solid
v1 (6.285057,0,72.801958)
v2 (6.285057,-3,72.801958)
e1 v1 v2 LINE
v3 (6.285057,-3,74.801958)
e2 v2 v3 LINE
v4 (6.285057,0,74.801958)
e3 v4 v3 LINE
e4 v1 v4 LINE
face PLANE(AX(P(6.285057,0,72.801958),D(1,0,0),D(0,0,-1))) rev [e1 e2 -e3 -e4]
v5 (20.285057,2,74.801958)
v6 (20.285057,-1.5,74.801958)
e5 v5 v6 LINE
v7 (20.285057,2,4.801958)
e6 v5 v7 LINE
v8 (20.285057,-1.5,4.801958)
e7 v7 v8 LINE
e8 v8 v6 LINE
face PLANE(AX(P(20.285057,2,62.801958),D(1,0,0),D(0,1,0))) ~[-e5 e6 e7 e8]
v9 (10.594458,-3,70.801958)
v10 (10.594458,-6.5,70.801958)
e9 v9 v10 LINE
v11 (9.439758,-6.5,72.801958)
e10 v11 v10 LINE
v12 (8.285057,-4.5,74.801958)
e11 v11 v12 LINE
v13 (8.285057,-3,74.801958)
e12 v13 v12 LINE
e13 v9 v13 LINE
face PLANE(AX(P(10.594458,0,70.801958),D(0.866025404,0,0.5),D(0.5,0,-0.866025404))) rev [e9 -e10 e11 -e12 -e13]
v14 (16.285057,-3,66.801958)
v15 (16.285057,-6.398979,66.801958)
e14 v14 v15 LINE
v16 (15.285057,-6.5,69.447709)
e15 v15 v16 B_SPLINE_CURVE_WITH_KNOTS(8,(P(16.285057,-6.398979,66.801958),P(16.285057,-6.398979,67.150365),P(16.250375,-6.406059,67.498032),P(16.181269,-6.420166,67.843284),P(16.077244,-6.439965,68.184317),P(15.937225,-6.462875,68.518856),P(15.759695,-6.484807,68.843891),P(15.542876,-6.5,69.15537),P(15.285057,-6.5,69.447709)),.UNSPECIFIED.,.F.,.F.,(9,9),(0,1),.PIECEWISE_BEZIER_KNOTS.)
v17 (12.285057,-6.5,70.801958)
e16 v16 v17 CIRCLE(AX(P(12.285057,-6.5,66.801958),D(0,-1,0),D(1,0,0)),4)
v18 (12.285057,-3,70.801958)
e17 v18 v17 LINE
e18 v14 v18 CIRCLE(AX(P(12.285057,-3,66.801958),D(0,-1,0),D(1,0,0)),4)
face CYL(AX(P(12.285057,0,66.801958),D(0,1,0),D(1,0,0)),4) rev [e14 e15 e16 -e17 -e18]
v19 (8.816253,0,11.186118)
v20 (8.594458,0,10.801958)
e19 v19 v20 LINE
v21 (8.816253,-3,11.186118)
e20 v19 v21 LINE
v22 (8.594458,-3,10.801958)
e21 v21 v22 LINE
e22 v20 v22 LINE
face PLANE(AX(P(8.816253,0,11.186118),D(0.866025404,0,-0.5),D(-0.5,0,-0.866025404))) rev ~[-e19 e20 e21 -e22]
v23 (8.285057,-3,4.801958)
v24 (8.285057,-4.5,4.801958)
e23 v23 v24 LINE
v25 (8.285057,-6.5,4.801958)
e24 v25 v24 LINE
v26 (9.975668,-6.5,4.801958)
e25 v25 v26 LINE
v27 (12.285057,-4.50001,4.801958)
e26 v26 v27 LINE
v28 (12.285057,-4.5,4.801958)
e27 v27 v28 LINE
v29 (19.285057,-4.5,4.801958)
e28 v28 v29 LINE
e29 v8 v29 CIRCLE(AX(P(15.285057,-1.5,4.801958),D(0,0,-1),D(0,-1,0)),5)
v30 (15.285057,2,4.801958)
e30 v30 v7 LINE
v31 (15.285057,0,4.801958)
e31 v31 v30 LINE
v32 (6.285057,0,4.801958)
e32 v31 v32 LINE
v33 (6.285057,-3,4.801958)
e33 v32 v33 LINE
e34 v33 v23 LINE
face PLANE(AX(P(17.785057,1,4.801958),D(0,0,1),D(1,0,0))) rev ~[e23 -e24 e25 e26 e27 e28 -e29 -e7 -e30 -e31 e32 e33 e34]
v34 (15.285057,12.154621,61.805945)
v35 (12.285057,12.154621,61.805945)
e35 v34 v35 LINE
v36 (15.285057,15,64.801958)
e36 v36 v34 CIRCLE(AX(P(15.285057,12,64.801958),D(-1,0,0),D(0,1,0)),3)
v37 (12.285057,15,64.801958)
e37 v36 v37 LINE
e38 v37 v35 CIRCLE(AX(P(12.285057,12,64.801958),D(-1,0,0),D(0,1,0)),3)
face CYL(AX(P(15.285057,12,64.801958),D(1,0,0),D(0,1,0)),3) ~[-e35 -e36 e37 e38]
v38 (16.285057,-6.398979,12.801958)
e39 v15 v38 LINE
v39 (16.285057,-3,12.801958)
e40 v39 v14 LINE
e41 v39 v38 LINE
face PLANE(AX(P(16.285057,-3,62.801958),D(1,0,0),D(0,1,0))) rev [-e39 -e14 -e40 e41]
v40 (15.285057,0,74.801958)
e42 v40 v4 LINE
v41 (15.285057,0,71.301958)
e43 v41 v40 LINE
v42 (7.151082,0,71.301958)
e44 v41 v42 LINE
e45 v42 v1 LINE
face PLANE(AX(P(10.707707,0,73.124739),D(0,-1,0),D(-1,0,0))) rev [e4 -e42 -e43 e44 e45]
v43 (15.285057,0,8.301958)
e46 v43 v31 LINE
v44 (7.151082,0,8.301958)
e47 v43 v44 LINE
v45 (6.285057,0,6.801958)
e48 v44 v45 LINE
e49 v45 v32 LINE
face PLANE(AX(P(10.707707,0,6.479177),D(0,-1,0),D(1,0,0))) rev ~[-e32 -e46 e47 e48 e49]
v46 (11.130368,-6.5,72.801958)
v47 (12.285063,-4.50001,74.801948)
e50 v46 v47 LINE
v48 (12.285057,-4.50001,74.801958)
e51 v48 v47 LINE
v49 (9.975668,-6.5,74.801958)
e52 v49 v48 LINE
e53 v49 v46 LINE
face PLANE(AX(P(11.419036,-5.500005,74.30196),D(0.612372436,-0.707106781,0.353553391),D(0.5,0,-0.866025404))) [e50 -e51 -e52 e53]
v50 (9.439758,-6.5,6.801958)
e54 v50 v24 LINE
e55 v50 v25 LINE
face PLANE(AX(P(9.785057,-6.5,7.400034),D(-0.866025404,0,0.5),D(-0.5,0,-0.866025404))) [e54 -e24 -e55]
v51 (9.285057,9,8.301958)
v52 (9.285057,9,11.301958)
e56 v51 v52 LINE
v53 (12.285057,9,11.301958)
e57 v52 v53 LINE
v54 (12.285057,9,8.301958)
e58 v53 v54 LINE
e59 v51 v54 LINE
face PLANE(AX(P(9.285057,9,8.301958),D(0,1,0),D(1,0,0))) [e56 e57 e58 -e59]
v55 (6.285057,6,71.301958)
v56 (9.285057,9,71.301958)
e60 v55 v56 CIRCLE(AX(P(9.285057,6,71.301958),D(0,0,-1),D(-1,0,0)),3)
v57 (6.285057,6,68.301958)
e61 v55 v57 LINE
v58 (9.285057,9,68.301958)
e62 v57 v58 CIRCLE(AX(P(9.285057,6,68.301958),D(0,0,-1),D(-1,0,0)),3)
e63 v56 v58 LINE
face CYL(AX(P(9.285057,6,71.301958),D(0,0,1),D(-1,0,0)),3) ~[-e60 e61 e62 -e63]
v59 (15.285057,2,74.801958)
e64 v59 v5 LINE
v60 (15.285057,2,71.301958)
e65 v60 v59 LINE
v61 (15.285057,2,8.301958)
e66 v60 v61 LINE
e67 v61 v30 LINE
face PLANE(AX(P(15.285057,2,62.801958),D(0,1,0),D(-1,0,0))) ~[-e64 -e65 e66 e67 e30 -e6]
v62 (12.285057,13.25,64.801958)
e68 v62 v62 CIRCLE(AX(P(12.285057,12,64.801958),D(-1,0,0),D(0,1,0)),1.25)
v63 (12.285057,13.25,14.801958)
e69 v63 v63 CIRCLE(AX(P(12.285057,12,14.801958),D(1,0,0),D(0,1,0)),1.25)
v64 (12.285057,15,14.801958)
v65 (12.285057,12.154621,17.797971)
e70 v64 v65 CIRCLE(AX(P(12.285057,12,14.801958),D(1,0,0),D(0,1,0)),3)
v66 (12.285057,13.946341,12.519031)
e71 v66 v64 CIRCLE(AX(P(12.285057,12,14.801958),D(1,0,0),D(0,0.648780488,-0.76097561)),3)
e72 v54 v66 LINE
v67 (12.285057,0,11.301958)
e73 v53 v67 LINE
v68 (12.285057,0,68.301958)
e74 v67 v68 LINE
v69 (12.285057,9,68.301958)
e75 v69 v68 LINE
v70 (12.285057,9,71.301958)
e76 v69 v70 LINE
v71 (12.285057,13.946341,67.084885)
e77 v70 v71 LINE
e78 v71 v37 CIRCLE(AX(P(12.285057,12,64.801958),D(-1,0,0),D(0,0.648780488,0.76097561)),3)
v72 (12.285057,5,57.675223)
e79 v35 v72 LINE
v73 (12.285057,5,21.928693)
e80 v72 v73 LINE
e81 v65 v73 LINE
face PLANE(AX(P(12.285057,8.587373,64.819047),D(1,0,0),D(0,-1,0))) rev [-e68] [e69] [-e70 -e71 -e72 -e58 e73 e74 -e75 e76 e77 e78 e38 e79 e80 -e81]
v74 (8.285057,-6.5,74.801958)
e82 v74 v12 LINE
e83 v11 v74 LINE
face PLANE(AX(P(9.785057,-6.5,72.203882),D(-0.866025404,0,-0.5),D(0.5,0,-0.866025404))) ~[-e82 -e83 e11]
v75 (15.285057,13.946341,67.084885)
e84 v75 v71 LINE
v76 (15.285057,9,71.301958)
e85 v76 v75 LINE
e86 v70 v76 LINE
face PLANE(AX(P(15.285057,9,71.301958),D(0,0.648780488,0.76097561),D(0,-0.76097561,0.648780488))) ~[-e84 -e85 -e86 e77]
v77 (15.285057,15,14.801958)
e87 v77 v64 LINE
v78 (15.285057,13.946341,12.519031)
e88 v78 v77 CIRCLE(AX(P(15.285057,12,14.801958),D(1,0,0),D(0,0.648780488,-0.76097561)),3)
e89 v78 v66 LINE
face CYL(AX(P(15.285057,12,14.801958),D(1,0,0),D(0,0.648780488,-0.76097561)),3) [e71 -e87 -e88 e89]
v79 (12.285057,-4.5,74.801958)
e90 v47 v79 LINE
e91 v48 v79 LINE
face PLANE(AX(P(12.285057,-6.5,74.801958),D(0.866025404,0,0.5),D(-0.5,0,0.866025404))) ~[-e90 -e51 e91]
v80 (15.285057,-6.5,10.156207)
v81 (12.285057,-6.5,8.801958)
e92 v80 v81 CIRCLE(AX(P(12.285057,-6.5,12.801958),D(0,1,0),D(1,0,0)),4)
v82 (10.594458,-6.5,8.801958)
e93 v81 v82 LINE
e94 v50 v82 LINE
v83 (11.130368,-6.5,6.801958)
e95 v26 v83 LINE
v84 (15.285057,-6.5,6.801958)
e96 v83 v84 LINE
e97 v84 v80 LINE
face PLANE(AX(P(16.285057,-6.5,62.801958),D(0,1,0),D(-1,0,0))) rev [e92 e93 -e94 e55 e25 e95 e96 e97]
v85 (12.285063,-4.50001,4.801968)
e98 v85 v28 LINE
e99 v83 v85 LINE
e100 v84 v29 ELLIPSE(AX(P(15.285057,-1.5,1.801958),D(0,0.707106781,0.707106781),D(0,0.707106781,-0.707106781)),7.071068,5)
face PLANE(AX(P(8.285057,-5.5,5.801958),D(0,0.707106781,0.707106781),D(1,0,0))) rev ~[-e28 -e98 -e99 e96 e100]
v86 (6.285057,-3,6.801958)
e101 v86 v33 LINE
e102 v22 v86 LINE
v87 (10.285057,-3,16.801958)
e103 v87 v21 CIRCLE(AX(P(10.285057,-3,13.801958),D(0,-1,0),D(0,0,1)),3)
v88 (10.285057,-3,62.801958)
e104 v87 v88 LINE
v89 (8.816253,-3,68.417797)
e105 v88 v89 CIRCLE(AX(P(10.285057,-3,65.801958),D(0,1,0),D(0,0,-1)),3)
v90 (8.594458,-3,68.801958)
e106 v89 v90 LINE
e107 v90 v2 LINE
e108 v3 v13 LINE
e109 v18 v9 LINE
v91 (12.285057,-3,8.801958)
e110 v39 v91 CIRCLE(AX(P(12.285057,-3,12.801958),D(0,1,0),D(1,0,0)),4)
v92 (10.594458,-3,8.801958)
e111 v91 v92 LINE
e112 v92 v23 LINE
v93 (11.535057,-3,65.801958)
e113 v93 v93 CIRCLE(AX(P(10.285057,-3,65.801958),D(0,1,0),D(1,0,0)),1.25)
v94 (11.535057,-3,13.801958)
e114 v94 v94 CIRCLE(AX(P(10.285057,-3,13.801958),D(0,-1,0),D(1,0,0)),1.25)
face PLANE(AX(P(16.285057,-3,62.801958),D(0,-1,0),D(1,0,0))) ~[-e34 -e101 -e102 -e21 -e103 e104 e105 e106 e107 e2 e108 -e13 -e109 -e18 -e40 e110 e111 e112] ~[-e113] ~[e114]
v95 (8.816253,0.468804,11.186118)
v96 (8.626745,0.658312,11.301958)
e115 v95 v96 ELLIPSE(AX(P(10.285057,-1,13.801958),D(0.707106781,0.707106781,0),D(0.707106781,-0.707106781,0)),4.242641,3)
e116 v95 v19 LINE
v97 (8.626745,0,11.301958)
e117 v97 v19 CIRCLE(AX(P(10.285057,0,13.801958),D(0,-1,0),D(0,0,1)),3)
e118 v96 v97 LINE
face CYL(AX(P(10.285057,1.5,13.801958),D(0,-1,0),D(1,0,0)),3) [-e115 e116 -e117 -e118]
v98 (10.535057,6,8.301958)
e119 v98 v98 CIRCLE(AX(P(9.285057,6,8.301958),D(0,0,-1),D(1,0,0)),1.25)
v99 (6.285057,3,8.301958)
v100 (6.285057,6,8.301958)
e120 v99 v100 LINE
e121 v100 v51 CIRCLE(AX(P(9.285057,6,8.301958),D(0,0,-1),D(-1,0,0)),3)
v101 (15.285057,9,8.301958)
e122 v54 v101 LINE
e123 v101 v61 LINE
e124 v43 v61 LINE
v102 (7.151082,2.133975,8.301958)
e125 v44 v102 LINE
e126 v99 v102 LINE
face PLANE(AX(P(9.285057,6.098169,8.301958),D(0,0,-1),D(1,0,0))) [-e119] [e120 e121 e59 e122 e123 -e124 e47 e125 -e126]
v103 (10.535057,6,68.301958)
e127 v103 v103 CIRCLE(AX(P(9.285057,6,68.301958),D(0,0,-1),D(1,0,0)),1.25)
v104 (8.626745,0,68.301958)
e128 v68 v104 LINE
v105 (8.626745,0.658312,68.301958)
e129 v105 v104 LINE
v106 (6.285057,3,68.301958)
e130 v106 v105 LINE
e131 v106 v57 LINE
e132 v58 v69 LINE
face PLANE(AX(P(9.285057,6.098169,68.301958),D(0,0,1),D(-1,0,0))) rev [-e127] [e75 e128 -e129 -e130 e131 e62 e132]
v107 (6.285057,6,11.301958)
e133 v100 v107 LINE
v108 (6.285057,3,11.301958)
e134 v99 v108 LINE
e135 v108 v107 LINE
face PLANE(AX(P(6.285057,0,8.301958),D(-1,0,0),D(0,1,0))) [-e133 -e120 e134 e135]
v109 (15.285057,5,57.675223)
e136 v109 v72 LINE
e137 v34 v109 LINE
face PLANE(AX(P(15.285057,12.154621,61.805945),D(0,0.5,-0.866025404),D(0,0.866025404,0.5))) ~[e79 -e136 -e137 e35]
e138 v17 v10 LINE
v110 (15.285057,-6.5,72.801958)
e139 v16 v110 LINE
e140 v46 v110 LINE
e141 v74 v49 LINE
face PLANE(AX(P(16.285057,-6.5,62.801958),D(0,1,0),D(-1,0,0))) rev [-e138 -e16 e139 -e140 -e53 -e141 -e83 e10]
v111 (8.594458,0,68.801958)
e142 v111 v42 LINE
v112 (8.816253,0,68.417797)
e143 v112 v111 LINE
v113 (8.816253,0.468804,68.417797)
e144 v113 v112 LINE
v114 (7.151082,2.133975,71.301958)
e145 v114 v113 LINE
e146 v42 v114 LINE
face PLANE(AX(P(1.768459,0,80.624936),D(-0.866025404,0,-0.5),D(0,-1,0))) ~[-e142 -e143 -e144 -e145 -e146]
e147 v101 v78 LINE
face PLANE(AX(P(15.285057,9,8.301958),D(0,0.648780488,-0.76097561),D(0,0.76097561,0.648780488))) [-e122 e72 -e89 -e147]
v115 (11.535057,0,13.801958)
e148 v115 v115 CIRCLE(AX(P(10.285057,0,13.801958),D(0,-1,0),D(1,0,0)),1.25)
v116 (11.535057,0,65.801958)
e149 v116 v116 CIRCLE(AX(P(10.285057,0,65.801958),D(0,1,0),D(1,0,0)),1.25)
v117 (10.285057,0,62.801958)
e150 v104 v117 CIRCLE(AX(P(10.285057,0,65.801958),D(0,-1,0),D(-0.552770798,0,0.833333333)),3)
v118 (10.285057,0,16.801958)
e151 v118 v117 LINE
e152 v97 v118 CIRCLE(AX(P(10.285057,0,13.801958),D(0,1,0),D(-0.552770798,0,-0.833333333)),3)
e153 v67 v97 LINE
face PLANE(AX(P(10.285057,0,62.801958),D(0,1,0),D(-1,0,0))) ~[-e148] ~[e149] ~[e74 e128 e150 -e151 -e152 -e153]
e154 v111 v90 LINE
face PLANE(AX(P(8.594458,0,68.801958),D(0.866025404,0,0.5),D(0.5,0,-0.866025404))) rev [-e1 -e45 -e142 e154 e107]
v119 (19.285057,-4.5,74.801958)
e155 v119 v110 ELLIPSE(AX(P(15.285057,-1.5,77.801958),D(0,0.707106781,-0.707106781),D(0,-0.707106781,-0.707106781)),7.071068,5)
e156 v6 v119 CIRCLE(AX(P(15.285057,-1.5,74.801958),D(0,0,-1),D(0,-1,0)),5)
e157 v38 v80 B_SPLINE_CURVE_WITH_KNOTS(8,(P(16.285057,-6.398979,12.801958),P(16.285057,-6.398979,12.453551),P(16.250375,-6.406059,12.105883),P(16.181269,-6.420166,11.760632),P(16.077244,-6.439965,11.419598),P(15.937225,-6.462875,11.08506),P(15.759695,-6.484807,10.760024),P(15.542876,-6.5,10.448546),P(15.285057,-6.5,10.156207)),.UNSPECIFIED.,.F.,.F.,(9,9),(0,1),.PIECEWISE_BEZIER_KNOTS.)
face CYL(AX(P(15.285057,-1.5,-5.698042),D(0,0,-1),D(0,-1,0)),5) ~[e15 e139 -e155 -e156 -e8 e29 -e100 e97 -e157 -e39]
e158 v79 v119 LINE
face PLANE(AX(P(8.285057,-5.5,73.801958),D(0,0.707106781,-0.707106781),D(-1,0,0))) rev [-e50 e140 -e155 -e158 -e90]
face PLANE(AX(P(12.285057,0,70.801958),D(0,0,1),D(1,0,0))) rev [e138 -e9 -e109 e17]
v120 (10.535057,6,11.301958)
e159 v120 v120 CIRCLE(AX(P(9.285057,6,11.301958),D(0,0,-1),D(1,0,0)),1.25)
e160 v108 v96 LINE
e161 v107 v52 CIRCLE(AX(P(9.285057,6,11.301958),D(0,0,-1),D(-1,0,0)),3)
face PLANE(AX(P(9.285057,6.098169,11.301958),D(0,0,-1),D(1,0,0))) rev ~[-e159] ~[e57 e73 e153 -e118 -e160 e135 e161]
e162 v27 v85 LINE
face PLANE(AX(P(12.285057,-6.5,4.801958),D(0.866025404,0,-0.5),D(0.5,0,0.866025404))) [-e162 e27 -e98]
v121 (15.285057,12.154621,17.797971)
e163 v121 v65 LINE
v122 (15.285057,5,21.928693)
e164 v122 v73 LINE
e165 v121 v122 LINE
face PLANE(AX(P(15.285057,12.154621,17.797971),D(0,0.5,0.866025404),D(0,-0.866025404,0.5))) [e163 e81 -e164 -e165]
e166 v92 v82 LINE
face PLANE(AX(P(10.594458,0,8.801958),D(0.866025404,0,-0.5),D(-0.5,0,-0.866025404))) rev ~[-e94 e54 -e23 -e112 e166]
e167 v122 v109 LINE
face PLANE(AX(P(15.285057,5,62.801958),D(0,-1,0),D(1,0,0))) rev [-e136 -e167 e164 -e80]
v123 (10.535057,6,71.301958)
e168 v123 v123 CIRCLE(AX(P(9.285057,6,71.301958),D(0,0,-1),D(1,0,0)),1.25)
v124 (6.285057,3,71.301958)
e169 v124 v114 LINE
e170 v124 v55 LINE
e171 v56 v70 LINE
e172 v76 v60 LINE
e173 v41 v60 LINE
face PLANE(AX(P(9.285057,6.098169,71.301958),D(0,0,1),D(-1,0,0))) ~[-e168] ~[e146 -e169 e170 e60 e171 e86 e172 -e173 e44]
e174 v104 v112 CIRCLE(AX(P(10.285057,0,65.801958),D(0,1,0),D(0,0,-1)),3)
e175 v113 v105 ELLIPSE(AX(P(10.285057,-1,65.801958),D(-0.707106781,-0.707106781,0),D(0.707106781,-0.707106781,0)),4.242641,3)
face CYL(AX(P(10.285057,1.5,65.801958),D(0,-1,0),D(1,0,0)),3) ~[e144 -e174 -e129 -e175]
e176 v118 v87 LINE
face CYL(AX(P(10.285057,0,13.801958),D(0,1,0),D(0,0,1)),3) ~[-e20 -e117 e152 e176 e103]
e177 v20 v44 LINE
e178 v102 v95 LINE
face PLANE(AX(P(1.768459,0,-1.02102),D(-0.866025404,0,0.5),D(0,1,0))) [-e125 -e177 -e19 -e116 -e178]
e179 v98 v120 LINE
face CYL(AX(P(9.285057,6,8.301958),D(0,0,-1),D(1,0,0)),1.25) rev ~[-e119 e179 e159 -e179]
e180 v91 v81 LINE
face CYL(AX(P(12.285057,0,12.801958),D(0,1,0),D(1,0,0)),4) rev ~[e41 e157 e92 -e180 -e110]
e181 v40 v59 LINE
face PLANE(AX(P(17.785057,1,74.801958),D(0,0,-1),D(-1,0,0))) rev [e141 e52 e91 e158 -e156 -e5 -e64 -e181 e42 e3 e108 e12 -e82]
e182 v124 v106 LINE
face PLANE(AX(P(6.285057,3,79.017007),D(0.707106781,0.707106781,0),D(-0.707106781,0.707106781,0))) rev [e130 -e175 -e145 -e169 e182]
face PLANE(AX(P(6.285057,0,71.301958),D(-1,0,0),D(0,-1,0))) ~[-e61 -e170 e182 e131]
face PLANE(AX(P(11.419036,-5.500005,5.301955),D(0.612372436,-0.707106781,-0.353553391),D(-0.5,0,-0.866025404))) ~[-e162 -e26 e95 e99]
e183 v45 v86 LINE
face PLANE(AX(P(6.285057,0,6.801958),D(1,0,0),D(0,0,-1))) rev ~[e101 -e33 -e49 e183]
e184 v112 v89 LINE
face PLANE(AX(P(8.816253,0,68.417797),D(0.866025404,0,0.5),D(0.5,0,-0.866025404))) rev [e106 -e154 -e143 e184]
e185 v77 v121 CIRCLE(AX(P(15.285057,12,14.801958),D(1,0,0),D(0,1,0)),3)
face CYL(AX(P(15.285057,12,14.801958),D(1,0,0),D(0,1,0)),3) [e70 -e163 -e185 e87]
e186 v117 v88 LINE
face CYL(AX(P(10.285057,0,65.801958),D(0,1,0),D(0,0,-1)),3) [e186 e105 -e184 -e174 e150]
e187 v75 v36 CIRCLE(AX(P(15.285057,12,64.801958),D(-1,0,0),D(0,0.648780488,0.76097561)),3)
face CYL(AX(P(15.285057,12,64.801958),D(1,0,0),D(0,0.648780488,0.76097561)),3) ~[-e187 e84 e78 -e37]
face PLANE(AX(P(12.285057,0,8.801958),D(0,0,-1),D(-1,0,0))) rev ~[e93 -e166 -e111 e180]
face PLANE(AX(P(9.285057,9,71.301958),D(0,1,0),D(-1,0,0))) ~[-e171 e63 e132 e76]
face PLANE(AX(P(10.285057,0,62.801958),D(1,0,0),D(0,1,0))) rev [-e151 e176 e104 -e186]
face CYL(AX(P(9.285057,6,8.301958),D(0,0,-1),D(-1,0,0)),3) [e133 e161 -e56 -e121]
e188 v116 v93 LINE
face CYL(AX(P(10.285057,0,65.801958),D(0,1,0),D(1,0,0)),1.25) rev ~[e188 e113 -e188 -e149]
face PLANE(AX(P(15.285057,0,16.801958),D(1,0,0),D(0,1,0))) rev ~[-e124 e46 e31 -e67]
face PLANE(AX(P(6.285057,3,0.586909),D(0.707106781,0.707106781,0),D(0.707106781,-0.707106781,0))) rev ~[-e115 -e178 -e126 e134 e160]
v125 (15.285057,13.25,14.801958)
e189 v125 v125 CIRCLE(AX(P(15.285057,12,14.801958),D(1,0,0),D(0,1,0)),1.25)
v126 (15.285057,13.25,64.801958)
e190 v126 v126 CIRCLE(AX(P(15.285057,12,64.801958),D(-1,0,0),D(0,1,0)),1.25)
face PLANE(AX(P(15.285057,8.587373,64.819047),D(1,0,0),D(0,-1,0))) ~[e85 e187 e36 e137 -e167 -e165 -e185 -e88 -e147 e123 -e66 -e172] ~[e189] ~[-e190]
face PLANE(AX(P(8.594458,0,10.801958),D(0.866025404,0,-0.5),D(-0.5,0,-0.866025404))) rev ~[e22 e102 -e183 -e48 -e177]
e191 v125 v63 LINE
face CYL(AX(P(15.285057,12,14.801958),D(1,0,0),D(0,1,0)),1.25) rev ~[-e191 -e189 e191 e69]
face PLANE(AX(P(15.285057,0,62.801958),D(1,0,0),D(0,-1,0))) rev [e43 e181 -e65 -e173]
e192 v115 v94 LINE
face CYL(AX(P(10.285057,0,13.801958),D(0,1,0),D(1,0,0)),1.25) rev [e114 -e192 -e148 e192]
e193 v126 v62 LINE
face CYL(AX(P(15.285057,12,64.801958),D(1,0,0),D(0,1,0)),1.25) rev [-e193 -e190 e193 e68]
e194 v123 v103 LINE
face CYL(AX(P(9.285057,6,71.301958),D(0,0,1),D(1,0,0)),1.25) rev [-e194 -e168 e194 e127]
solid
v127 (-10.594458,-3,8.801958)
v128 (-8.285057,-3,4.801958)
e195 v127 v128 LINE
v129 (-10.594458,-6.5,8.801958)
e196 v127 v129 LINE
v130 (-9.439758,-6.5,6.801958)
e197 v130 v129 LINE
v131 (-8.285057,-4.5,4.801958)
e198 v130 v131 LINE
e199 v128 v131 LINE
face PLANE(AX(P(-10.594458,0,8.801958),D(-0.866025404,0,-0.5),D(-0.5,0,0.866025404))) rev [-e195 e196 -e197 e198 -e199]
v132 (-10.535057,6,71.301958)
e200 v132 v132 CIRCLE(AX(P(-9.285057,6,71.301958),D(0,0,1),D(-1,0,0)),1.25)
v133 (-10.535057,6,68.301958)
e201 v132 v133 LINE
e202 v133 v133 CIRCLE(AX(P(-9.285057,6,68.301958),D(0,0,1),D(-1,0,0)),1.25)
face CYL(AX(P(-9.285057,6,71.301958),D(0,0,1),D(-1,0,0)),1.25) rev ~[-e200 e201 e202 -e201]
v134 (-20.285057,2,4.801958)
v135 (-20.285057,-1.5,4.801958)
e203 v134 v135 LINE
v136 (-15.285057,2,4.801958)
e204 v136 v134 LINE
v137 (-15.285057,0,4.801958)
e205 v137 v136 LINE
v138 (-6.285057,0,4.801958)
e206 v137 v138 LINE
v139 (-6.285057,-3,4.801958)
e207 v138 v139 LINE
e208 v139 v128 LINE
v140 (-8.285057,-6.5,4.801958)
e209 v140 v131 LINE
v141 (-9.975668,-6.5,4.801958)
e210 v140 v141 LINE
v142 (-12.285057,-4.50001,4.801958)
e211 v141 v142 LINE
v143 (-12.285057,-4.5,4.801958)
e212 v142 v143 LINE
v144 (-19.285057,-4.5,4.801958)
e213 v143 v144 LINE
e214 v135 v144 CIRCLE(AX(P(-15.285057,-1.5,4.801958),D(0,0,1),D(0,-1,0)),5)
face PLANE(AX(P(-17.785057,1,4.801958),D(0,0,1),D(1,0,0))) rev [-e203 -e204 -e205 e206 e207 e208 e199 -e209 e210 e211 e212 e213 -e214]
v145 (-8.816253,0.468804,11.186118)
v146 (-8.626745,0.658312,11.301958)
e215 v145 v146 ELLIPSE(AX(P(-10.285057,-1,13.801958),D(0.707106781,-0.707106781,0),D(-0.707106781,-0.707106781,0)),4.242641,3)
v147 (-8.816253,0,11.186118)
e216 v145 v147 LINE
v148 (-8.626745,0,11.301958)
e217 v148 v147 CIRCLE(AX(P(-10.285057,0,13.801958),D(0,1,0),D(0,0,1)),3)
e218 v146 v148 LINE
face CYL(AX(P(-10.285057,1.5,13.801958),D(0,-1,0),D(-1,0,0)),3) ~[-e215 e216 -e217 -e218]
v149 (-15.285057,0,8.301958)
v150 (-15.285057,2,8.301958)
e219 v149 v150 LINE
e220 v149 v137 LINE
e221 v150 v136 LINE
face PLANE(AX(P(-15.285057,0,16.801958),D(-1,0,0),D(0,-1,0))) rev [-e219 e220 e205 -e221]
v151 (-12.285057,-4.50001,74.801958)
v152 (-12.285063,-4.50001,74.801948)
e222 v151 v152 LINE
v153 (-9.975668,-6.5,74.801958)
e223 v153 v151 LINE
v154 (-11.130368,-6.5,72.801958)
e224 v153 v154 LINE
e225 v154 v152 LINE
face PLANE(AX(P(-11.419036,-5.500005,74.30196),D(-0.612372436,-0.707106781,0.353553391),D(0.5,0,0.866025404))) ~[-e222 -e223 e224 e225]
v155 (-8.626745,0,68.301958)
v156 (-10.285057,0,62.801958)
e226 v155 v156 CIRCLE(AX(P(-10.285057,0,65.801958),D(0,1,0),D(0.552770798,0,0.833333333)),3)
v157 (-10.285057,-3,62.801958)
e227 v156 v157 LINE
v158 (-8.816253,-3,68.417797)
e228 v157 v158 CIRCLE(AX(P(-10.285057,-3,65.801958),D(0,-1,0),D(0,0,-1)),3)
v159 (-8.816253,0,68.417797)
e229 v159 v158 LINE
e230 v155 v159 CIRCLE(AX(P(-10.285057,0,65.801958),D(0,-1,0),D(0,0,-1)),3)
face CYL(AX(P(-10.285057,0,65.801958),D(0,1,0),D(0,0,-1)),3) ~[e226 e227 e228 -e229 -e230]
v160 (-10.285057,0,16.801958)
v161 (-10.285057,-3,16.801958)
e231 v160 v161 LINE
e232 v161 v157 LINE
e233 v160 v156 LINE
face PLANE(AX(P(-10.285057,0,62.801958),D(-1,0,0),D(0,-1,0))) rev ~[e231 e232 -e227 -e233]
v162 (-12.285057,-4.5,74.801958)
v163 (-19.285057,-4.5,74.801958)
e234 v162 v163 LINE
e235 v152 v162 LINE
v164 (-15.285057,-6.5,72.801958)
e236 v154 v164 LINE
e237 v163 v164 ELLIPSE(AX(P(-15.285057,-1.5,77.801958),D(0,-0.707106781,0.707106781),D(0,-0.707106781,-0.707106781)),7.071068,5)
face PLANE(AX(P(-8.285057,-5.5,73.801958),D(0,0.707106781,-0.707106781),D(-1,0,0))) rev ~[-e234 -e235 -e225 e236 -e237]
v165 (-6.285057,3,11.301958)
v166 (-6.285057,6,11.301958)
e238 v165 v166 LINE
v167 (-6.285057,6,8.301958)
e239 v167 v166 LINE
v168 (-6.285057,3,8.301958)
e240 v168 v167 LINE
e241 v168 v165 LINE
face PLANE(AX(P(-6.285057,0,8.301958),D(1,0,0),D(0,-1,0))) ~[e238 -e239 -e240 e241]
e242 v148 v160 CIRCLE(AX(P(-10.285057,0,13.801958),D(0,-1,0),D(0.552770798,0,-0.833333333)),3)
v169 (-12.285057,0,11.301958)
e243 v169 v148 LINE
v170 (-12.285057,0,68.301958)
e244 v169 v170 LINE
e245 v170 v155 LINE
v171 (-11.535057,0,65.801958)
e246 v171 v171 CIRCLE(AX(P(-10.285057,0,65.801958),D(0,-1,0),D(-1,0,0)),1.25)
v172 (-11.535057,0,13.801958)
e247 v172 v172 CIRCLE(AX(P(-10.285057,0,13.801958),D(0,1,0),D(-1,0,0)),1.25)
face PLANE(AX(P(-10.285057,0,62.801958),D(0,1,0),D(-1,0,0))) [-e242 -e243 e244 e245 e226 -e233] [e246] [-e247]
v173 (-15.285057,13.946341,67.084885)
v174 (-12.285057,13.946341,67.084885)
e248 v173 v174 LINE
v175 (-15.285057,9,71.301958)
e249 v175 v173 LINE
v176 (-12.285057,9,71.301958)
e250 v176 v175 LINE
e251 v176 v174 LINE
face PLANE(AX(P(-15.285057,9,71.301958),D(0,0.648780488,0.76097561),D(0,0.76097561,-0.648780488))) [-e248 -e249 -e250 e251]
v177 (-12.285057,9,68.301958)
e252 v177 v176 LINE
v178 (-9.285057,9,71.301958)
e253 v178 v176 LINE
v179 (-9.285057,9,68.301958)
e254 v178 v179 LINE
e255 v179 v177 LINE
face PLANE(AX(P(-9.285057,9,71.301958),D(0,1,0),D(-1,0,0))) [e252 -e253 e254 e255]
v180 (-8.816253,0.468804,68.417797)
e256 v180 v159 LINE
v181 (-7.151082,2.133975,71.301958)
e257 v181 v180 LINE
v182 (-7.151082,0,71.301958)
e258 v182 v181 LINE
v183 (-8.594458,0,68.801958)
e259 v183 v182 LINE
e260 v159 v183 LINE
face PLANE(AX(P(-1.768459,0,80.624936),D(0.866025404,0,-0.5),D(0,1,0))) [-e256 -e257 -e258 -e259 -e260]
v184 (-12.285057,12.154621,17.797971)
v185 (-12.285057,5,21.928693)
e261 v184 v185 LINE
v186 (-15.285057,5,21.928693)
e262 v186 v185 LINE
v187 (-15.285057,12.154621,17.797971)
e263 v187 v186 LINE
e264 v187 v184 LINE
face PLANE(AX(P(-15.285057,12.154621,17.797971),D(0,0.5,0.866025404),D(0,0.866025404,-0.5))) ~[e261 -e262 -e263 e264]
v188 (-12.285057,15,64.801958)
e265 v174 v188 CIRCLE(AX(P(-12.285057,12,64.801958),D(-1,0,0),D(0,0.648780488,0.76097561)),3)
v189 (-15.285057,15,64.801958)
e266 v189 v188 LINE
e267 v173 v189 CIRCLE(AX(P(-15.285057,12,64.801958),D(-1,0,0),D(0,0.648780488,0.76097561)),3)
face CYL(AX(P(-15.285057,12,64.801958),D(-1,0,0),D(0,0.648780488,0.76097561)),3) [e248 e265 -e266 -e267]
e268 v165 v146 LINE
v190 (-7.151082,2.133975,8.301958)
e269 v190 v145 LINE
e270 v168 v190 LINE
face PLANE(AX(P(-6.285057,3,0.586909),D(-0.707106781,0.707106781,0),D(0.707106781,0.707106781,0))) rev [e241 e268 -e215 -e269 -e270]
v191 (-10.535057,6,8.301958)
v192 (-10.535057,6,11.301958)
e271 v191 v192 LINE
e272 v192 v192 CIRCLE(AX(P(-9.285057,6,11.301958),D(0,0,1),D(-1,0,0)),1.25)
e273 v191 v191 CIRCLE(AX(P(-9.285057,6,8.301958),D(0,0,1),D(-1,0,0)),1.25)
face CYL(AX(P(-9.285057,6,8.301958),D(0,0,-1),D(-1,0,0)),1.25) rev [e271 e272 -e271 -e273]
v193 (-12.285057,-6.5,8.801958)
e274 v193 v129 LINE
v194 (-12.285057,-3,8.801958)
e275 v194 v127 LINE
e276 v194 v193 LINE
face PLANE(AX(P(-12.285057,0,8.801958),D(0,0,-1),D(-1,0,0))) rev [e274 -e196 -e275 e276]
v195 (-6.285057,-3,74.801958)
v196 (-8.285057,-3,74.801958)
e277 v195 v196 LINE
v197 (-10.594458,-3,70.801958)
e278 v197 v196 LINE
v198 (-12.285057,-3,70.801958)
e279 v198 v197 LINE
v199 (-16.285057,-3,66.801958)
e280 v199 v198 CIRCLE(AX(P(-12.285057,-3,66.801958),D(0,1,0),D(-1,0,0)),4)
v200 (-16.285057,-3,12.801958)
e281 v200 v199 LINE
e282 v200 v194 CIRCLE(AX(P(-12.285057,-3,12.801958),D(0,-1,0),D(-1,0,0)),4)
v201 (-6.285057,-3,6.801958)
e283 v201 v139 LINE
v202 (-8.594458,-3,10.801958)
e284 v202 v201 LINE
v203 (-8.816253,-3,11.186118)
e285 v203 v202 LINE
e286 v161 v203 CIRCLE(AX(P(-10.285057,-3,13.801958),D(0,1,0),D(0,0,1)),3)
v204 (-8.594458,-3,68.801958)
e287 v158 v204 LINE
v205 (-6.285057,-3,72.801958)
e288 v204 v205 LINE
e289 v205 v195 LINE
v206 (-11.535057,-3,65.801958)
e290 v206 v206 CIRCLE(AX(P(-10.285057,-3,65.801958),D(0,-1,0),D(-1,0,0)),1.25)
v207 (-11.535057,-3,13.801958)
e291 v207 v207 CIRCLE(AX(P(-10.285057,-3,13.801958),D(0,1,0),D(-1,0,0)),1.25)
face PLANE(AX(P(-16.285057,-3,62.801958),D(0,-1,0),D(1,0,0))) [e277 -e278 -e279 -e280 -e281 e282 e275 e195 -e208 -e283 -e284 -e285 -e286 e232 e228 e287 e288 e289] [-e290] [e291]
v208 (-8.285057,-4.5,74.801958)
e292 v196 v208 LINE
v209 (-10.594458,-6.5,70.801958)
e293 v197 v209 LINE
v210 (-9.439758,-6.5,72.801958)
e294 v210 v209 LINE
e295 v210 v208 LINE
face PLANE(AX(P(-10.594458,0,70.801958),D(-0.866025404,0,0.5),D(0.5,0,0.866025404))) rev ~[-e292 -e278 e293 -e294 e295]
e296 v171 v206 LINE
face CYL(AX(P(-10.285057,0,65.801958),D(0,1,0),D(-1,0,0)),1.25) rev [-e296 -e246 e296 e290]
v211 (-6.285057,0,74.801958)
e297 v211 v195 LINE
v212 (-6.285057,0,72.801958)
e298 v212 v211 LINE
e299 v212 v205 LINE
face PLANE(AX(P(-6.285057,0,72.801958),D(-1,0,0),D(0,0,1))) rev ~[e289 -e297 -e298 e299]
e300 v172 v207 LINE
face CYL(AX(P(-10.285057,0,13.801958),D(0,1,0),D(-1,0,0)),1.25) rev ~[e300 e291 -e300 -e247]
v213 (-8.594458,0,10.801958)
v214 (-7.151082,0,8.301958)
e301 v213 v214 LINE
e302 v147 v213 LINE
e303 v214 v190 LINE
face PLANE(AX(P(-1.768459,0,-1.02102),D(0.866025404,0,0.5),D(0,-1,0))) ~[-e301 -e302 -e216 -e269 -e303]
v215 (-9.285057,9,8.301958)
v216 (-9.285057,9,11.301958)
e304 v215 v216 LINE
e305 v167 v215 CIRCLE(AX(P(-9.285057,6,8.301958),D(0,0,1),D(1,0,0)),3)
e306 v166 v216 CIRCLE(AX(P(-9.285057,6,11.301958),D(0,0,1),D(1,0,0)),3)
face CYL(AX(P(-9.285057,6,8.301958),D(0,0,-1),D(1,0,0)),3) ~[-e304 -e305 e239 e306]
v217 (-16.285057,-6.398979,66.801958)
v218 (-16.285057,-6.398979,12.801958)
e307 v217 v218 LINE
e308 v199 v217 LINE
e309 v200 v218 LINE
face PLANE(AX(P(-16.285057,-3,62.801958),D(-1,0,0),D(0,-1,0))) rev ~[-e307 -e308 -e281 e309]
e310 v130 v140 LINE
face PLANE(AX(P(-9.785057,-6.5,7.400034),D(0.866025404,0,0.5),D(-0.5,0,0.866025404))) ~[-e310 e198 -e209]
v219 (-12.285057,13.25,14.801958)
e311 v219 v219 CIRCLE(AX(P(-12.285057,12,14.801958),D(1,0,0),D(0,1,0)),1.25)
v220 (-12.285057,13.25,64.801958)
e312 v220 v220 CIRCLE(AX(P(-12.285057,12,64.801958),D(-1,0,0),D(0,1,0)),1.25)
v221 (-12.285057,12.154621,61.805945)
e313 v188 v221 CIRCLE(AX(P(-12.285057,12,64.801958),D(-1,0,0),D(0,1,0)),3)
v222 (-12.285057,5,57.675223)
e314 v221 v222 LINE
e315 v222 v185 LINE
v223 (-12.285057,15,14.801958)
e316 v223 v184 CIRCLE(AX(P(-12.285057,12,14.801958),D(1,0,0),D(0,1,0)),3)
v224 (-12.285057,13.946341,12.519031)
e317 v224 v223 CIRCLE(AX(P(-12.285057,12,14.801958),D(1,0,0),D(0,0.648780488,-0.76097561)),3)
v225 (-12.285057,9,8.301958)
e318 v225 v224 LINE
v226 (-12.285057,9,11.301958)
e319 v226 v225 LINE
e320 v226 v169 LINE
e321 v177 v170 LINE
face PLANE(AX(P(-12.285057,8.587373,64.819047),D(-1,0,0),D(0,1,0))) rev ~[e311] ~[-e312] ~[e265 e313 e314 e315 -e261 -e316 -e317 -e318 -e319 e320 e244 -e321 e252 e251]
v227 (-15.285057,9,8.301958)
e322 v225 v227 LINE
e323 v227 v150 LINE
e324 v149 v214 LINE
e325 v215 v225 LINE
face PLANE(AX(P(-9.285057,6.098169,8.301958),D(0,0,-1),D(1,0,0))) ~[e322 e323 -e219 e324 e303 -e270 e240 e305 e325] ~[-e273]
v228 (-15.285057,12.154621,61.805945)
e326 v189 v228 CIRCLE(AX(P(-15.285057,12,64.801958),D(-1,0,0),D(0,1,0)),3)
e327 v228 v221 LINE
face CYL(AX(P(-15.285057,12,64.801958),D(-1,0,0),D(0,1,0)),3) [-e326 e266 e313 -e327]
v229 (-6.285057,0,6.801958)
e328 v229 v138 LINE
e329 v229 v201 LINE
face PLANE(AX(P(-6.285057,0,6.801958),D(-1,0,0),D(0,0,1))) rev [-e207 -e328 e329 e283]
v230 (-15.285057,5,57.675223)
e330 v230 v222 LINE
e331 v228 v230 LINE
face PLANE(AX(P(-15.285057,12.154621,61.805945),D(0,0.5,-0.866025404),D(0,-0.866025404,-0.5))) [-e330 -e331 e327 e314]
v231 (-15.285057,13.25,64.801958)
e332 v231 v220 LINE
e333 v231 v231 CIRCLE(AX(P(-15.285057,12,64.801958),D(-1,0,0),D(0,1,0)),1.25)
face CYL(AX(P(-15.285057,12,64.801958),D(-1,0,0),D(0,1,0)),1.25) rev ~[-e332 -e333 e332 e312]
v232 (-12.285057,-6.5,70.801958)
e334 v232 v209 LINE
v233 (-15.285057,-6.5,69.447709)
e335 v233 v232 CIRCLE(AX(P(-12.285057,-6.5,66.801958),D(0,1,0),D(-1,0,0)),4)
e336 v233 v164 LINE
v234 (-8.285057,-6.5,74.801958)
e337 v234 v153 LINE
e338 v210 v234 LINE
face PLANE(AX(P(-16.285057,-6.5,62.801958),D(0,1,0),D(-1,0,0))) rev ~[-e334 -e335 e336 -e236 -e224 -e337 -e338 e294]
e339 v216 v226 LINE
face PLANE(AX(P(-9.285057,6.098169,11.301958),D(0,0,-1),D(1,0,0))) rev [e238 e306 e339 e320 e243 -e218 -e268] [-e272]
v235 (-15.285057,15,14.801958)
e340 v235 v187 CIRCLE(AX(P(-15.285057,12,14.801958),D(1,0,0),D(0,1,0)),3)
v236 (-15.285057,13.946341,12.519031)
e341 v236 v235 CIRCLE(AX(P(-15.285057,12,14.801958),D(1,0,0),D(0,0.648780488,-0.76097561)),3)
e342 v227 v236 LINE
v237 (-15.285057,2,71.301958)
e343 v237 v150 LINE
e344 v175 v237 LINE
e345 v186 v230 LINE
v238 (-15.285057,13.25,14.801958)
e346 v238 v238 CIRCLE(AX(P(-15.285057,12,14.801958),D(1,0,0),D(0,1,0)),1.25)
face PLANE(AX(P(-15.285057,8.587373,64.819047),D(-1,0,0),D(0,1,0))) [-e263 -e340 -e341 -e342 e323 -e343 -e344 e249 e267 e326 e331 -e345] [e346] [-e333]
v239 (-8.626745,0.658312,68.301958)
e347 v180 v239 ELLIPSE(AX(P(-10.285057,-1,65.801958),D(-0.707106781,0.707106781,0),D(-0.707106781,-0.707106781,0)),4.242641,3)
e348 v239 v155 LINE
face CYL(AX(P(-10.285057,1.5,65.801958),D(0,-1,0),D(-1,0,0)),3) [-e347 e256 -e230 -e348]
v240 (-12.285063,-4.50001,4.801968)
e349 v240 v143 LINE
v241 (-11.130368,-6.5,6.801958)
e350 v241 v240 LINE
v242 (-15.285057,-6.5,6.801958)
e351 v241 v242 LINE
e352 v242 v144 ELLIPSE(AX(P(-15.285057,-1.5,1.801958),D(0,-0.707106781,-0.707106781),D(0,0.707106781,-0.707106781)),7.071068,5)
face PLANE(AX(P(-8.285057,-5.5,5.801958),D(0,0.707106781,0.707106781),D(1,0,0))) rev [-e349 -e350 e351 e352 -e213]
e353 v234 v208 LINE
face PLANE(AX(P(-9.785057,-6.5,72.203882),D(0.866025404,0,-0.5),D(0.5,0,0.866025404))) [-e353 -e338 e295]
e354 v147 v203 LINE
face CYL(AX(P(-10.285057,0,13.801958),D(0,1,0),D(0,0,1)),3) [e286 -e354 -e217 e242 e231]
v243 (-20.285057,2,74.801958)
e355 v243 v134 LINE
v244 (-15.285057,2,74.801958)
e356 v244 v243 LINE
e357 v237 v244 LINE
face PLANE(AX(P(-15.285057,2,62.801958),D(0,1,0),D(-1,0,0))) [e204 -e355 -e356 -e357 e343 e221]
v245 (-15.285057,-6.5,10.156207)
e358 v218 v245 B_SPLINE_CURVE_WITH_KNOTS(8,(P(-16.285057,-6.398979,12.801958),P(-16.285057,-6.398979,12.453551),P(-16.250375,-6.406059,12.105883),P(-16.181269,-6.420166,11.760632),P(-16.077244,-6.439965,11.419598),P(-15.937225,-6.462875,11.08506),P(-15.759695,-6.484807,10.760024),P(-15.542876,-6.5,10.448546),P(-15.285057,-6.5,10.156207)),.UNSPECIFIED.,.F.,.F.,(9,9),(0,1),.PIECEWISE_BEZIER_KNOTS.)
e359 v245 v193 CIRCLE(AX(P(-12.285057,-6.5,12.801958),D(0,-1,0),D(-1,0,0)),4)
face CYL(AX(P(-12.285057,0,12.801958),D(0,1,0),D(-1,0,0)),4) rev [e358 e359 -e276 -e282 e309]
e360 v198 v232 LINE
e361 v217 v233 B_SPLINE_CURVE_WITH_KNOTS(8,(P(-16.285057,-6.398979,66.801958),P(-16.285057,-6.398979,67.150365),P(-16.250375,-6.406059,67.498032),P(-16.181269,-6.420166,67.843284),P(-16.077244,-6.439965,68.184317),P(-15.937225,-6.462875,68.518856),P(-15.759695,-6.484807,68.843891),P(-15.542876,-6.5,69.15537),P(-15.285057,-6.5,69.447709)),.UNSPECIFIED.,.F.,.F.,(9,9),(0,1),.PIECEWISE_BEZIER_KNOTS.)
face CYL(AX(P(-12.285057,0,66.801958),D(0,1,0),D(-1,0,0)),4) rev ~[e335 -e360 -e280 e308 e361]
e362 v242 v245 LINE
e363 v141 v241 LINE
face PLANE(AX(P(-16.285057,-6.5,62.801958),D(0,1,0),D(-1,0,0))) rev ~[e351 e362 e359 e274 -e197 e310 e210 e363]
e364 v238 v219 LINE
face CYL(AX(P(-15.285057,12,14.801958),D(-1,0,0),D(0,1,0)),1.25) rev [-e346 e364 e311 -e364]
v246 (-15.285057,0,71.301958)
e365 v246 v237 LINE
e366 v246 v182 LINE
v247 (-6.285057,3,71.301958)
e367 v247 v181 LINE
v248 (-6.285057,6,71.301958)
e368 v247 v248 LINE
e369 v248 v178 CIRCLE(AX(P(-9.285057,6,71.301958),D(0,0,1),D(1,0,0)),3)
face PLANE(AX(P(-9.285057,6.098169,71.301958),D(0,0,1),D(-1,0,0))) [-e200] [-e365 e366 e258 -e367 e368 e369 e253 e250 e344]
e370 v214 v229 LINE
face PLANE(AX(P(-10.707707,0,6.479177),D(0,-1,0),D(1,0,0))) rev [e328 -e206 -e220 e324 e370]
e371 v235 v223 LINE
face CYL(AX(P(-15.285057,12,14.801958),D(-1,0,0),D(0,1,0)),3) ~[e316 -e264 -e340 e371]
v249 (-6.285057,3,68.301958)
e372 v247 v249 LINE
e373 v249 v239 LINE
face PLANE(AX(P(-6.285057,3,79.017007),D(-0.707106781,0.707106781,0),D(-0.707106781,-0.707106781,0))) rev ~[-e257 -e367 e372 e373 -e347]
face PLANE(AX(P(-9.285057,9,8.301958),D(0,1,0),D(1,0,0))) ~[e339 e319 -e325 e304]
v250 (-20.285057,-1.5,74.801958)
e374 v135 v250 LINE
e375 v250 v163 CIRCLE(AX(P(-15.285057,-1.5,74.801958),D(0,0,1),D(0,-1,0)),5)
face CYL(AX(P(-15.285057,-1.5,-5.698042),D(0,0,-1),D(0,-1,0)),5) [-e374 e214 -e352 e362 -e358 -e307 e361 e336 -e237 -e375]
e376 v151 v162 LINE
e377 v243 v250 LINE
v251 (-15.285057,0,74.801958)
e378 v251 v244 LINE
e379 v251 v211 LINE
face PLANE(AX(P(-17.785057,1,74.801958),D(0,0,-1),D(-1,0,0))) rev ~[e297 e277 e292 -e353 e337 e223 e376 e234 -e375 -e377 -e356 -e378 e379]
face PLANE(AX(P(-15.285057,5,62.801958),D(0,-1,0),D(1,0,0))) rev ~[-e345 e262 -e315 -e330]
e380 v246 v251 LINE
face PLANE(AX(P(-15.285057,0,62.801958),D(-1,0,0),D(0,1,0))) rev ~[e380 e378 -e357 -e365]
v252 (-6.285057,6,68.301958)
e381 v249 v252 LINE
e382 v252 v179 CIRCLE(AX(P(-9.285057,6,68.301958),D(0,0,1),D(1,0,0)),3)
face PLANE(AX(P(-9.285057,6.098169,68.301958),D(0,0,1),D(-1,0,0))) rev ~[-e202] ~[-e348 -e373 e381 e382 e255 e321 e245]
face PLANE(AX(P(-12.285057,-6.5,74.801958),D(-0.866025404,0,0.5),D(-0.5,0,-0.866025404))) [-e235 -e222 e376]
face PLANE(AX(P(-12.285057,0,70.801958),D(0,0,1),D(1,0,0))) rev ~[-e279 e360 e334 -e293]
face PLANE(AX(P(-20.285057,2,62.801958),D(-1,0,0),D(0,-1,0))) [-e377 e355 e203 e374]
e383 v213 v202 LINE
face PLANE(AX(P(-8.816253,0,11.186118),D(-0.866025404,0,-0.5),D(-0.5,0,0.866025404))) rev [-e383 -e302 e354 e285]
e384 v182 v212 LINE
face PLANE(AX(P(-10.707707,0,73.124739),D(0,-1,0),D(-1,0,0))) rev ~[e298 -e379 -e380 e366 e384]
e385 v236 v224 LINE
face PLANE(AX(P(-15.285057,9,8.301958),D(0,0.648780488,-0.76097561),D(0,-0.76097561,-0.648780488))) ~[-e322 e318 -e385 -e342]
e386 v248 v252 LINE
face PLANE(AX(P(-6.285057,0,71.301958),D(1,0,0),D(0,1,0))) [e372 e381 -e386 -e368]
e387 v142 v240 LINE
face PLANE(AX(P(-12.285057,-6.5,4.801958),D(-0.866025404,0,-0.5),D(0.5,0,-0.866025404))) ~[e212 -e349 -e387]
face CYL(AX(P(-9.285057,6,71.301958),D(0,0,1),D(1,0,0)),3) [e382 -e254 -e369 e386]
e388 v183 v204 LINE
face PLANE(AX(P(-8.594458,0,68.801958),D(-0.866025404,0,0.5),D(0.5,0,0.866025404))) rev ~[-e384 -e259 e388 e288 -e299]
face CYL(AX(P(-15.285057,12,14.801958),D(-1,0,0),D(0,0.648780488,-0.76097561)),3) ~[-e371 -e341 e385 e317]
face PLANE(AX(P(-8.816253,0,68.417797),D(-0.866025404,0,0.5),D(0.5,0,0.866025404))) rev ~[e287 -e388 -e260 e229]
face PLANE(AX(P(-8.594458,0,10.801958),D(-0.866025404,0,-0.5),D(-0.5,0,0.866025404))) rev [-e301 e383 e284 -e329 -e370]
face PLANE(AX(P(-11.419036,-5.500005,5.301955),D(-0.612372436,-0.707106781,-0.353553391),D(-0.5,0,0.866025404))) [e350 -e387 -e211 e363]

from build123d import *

# Parameters (mm, degrees)
F0_W         = 4
F0_H         = 3
F1_DEPTH     = 6.5
F0_R         = 1.25
F2_DEPTH     = 3
F4_DEPTH     = 8.5
F3_W         = 5
F3_H         = 2
F5_DEPTH     = 12
F7_SIZE      = 2
F8_DEPTH     = 3
F9_SIZE      = 1.99999
F10_R        = 1.25
F11_DEPTH    = 3
F12_T4_DEPTH = 18.4300979278
F12_S5_R     = 3
F12_T6_DEPTH = 11
F13_DEPTH    = 23
F14_R        = 1.25
F15_DEPTH    = 3
F17_T1_DEPTH = 91


# Not quite as in the source:
# - a fillet or chamfer that OpenCascade refuses, or shapes differently, is made with other operations: its cross-section is extruded or revolved along the edge and cut away or added
# - a fillet or chamfer is up to 0.001 mm smaller than in the source, because OpenCascade refuses the exact size


with BuildPart() as f1:
    # F0 (on Front) → F1 (new body)
    with BuildSketch(Plane.XZ):
        Polygon((10.5944581591, 8.801957868), (8.2850570824, 4.801957868), (12.2850570824, 4.801957868), (12.2850570824, 8.801957868), align=None)
        with BuildLine():
            Line((12.2850570824, 8.801957868), (12.2850570824, 4.801957868))
            Line((12.2850570824, 4.801957868), (15.7850570824, 4.801957868))
            Line((15.7850570824, 4.801957868), (20.2850570824, 4.801957868))
            Line((20.2850570824, 4.801957868), (20.2850570824, 9.301957868))
            Line((20.2850570824, 9.301957868), (20.2850570824, 13.801957868))
            Line((20.2850570824, 13.801957868), (16.2850570824, 13.801957868))
            Line((16.2850570824, 13.801957868), (16.2850570824, 12.801957868))
            ThreePointArc((16.2850570824, 12.801957868), (15.1134842071, 9.9735307433), (12.2850570824, 8.801957868))
        make_face()
        with Locations((18.2850570824, 15.301957868)):
            Rectangle(F0_W, F0_H)
    extrude(amount=F1_DEPTH)

    # F0 (on Front) → F2 (join)
    with BuildSketch(Plane.XZ):
        Polygon((10.5944581591, 8.801957868), (8.2850570824, 4.801957868), (12.2850570824, 4.801957868), (12.2850570824, 8.801957868), align=None)
        with BuildLine():
            Line((6.2850570824, 4.801957868), (8.2850570824, 4.801957868))
            Line((8.2850570824, 4.801957868), (10.5944581591, 8.801957868))
            Line((10.5944581591, 8.801957868), (12.2850570824, 8.801957868))
            ThreePointArc((12.2850570824, 8.801957868), (15.1134842071, 9.9735307433), (16.2850570824, 12.801957868))
            Line((16.2850570824, 12.801957868), (16.2850570824, 13.801957868))
            Line((16.2850570824, 13.801957868), (16.2850570824, 16.801957868))
            Line((16.2850570824, 16.801957868), (10.2850570824, 16.801957868))
            ThreePointArc((10.2850570824, 16.801957868), (12.406377426, 15.9232782116), (13.2850570824, 13.801957868))
            ThreePointArc((13.2850570824, 13.801957868), (11.8005749683, 11.2129029174), (8.8162533907, 11.1861184779))
            Line((8.8162533907, 11.1861184779), (8.5944581591, 10.801957868))
            Line((8.5944581591, 10.801957868), (6.2850570824, 6.801957868))
            Line((6.2850570824, 6.801957868), (6.2850570824, 4.801957868))
        make_face()
        with BuildLine():
            Line((12.2850570824, 8.801957868), (12.2850570824, 4.801957868))
            Line((12.2850570824, 4.801957868), (15.7850570824, 4.801957868))
            Line((15.7850570824, 4.801957868), (20.2850570824, 4.801957868))
            Line((20.2850570824, 4.801957868), (20.2850570824, 9.301957868))
            Line((20.2850570824, 9.301957868), (20.2850570824, 13.801957868))
            Line((20.2850570824, 13.801957868), (16.2850570824, 13.801957868))
            Line((16.2850570824, 13.801957868), (16.2850570824, 12.801957868))
            ThreePointArc((16.2850570824, 12.801957868), (15.1134842071, 9.9735307433), (12.2850570824, 8.801957868))
        make_face()
        with Locations((18.2850570824, 15.301957868)):
            Rectangle(F0_W, F0_H)
        with BuildLine():
            ThreePointArc((10.2850570824, 16.801957868), (7.3826857958, 14.5610632064), (8.8162533907, 11.1861184779))
            ThreePointArc((8.8162533907, 11.1861184779), (11.8005749683, 11.2129029174), (13.2850570824, 13.801957868))
            ThreePointArc((13.2850570824, 13.801957868), (12.406377426, 15.9232782116), (10.2850570824, 16.801957868))
        make_face()
        with Locations((10.2850570824, 13.801957868)):
            Circle(F0_R, mode=Mode.SUBTRACT)
    extrude(amount=F2_DEPTH)

    # F3 (on face) → F4 (join)
    with BuildSketch(Plane.XY.offset(16.801957868)):
        Polygon((12.2850570824, 0), (15.2850570824, 0), (15.2850570824, 2), (15.2850570824, 5), (12.2850570824, 5), align=None)
    extrude(amount=-F4_DEPTH)

    # F3 (on face) → F5 (join)
    with BuildSketch(Plane.XY.offset(16.801957868)):
        with Locations((17.7850570824, 1)):
            Rectangle(F3_W, F3_H)
    extrude(amount=-F5_DEPTH)

    # F7
    f7_edges = [f1.edges().sort_by_distance(p)[0] for p in [
        (14.285057, -6.5, 4.801958),
    ]]
    chamfer(f7_edges, length=F7_SIZE)

    # F6 (on face) → F8 (join)
    with BuildSketch(Plane.XZ.offset(6.5)):
        Polygon((9.7850570824, 7.4000340794), (8.2850570824, 4.801957868), (12.2850570824, 4.801957868), (13.7850570824, 7.4000340794), align=None)
    extrude(amount=-F8_DEPTH)

    # F9 (size 2 in the source; OpenCascade refuses exactly that, so slightly less here)
    f9_edges = [f1.edges().sort_by_distance(p)[0] for p in [
        (12.862407, -6.5, 5.801958),
    ]]
    chamfer(f9_edges, length=F9_SIZE)

    # F10 (on face) → F11 (join)
    with BuildSketch(Plane(origin=(0, 0, 8.301957868), x_dir=(1, 0, 0), z_dir=(0, 0, -1))):
        with BuildLine():
            ThreePointArc((9.2850570824, -9), (11.406377426, -8.1213203436), (12.2850570824, -6))
            ThreePointArc((12.2850570824, -6), (9.2850570824, -3), (6.2850570824, -6))
            ThreePointArc((6.2850570824, -6), (7.1637367388, -8.1213203436), (9.2850570824, -9))
        make_face()
        with Locations((9.2850570824, -6)):
            Circle(F10_R, mode=Mode.SUBTRACT)
        with BuildLine():
            ThreePointArc((6.2850570824, -6), (9.2850570824, -3), (12.2850570824, -6))
            ThreePointArc((12.2850570824, -6), (11.406377426, -8.1213203436), (9.2850570824, -9))
            Line((9.2850570824, -9), (15.2850570824, -9))
            Line((15.2850570824, -9), (15.2850570824, -5))
            Line((15.2850570824, -5), (12.2850570824, -5))
            Line((12.2850570824, -5), (12.2850570824, 0))
            Line((12.2850570824, 0), (6.2850570824, 0))
            Line((6.2850570824, 0), (6.2850570824, -6))
        make_face()
    extrude(amount=-F11_DEPTH)

    # F12: chamfer of 3 on 1 edges, made by hand


with BuildPart() as f12_tool2:
    # F12_s3 → F12_t4 (new body)
    with BuildSketch(Plane.XY.offset(0.5869089041)):
        Polygon((6.2850570824, 3), (9.2850570824, 0), (6.2850570824, 0), align=None)
    extrude(amount=F12_T4_DEPTH)

    # F12_s5 → F12_t6 (cut, symmetric)
    with BuildSketch(Plane.XZ.offset(-1.5)):
        with Locations((10.2850570824, 13.801957868)):
            Circle(F12_S5_R)
    extrude(amount=F12_T6_DEPTH, both=True, mode=Mode.SUBTRACT)

    split(bisect_by=Plane(origin=(1.7684586572, 0, -1.0210200818), x_dir=(0, 1, 0), z_dir=(-0.8660254038, 0, 0.5)), keep=Keep.TOP)


with BuildPart() as f1_1:
    add(f1.part)

    # F12_t1: cut F12_tool2
    add(f12_tool2.part, mode=Mode.SUBTRACT)

    # F13 (add): a face of the model
    f13_faces = [f1_1.faces().sort_by_distance(p)[0] for p in [
        (15.9299846186, -0.9275362319, 16.801957868),
    ]]
    extrude(f13_faces, amount=F13_DEPTH)

    # F14 (on face) → F15 (join)
    with BuildSketch(Plane.YZ.offset(15.2850570824)):
        with BuildLine():
            Line((5, 14.801957868), (5, 11.301957868))
            Line((5, 11.301957868), (9, 11.301957868))
            Line((9, 11.301957868), (9, 8.301957868))
            Line((9, 8.301957868), (13.9463414634, 12.5190310388))
            ThreePointArc((13.9463414634, 12.5190310388), (9.1591706072, 13.8377543826), (12.1546210798, 17.7979706053))
            Line((12.1546210798, 17.7979706053), (5, 21.9286930117))
            Line((5, 21.9286930117), (5, 16.801957868))
            Line((5, 16.801957868), (5, 14.801957868))
        make_face()
        with BuildLine():
            ThreePointArc((12.1546210798, 17.7979706053), (9.1591706072, 13.8377543826), (13.9463414634, 12.5190310388))
            ThreePointArc((13.9463414634, 12.5190310388), (14.7238781535, 13.5447833357), (15, 14.801957868))
            ThreePointArc((15, 14.801957868), (14.1753003516, 16.867888259), (12.1546210798, 17.7979706053))
        make_face()
        with Locations((12, 14.801957868)):
            Circle(F14_R, mode=Mode.SUBTRACT)
    extrude(amount=-F15_DEPTH)

    # F16: F1 across face


with BuildPart() as f1_2:
    add(f1_1.part)
    add(f1_1.part.mirror(Plane(origin=(15.9299846186, -0.9275362319, 39.801957868), x_dir=(1, 0, 0), z_dir=(0, 0, 1))))

    # F17: fillet of radius 5 on 1 edges, made by hand

    # F17_s2 → F17_t1 (cut)
    with BuildSketch(Plane.XY.offset(-5.698042132)):
        with BuildLine():
            ThreePointArc((15.2850570824, -6.5), (18.8205909883, -5.0355339059), (20.2850570824, -1.5))
            Line((20.2850570824, -1.5), (20.2850570824, -6.5))
            Line((20.2850570824, -6.5), (15.2850570824, -6.5))
        make_face()
    extrude(amount=F17_T1_DEPTH, mode=Mode.SUBTRACT)


with BuildPart() as f18_1:
    # F18: instance of F1
    add(f1_2.part.mirror(Plane.YZ))


solid = Compound([f1_2.part, f18_1.part])
